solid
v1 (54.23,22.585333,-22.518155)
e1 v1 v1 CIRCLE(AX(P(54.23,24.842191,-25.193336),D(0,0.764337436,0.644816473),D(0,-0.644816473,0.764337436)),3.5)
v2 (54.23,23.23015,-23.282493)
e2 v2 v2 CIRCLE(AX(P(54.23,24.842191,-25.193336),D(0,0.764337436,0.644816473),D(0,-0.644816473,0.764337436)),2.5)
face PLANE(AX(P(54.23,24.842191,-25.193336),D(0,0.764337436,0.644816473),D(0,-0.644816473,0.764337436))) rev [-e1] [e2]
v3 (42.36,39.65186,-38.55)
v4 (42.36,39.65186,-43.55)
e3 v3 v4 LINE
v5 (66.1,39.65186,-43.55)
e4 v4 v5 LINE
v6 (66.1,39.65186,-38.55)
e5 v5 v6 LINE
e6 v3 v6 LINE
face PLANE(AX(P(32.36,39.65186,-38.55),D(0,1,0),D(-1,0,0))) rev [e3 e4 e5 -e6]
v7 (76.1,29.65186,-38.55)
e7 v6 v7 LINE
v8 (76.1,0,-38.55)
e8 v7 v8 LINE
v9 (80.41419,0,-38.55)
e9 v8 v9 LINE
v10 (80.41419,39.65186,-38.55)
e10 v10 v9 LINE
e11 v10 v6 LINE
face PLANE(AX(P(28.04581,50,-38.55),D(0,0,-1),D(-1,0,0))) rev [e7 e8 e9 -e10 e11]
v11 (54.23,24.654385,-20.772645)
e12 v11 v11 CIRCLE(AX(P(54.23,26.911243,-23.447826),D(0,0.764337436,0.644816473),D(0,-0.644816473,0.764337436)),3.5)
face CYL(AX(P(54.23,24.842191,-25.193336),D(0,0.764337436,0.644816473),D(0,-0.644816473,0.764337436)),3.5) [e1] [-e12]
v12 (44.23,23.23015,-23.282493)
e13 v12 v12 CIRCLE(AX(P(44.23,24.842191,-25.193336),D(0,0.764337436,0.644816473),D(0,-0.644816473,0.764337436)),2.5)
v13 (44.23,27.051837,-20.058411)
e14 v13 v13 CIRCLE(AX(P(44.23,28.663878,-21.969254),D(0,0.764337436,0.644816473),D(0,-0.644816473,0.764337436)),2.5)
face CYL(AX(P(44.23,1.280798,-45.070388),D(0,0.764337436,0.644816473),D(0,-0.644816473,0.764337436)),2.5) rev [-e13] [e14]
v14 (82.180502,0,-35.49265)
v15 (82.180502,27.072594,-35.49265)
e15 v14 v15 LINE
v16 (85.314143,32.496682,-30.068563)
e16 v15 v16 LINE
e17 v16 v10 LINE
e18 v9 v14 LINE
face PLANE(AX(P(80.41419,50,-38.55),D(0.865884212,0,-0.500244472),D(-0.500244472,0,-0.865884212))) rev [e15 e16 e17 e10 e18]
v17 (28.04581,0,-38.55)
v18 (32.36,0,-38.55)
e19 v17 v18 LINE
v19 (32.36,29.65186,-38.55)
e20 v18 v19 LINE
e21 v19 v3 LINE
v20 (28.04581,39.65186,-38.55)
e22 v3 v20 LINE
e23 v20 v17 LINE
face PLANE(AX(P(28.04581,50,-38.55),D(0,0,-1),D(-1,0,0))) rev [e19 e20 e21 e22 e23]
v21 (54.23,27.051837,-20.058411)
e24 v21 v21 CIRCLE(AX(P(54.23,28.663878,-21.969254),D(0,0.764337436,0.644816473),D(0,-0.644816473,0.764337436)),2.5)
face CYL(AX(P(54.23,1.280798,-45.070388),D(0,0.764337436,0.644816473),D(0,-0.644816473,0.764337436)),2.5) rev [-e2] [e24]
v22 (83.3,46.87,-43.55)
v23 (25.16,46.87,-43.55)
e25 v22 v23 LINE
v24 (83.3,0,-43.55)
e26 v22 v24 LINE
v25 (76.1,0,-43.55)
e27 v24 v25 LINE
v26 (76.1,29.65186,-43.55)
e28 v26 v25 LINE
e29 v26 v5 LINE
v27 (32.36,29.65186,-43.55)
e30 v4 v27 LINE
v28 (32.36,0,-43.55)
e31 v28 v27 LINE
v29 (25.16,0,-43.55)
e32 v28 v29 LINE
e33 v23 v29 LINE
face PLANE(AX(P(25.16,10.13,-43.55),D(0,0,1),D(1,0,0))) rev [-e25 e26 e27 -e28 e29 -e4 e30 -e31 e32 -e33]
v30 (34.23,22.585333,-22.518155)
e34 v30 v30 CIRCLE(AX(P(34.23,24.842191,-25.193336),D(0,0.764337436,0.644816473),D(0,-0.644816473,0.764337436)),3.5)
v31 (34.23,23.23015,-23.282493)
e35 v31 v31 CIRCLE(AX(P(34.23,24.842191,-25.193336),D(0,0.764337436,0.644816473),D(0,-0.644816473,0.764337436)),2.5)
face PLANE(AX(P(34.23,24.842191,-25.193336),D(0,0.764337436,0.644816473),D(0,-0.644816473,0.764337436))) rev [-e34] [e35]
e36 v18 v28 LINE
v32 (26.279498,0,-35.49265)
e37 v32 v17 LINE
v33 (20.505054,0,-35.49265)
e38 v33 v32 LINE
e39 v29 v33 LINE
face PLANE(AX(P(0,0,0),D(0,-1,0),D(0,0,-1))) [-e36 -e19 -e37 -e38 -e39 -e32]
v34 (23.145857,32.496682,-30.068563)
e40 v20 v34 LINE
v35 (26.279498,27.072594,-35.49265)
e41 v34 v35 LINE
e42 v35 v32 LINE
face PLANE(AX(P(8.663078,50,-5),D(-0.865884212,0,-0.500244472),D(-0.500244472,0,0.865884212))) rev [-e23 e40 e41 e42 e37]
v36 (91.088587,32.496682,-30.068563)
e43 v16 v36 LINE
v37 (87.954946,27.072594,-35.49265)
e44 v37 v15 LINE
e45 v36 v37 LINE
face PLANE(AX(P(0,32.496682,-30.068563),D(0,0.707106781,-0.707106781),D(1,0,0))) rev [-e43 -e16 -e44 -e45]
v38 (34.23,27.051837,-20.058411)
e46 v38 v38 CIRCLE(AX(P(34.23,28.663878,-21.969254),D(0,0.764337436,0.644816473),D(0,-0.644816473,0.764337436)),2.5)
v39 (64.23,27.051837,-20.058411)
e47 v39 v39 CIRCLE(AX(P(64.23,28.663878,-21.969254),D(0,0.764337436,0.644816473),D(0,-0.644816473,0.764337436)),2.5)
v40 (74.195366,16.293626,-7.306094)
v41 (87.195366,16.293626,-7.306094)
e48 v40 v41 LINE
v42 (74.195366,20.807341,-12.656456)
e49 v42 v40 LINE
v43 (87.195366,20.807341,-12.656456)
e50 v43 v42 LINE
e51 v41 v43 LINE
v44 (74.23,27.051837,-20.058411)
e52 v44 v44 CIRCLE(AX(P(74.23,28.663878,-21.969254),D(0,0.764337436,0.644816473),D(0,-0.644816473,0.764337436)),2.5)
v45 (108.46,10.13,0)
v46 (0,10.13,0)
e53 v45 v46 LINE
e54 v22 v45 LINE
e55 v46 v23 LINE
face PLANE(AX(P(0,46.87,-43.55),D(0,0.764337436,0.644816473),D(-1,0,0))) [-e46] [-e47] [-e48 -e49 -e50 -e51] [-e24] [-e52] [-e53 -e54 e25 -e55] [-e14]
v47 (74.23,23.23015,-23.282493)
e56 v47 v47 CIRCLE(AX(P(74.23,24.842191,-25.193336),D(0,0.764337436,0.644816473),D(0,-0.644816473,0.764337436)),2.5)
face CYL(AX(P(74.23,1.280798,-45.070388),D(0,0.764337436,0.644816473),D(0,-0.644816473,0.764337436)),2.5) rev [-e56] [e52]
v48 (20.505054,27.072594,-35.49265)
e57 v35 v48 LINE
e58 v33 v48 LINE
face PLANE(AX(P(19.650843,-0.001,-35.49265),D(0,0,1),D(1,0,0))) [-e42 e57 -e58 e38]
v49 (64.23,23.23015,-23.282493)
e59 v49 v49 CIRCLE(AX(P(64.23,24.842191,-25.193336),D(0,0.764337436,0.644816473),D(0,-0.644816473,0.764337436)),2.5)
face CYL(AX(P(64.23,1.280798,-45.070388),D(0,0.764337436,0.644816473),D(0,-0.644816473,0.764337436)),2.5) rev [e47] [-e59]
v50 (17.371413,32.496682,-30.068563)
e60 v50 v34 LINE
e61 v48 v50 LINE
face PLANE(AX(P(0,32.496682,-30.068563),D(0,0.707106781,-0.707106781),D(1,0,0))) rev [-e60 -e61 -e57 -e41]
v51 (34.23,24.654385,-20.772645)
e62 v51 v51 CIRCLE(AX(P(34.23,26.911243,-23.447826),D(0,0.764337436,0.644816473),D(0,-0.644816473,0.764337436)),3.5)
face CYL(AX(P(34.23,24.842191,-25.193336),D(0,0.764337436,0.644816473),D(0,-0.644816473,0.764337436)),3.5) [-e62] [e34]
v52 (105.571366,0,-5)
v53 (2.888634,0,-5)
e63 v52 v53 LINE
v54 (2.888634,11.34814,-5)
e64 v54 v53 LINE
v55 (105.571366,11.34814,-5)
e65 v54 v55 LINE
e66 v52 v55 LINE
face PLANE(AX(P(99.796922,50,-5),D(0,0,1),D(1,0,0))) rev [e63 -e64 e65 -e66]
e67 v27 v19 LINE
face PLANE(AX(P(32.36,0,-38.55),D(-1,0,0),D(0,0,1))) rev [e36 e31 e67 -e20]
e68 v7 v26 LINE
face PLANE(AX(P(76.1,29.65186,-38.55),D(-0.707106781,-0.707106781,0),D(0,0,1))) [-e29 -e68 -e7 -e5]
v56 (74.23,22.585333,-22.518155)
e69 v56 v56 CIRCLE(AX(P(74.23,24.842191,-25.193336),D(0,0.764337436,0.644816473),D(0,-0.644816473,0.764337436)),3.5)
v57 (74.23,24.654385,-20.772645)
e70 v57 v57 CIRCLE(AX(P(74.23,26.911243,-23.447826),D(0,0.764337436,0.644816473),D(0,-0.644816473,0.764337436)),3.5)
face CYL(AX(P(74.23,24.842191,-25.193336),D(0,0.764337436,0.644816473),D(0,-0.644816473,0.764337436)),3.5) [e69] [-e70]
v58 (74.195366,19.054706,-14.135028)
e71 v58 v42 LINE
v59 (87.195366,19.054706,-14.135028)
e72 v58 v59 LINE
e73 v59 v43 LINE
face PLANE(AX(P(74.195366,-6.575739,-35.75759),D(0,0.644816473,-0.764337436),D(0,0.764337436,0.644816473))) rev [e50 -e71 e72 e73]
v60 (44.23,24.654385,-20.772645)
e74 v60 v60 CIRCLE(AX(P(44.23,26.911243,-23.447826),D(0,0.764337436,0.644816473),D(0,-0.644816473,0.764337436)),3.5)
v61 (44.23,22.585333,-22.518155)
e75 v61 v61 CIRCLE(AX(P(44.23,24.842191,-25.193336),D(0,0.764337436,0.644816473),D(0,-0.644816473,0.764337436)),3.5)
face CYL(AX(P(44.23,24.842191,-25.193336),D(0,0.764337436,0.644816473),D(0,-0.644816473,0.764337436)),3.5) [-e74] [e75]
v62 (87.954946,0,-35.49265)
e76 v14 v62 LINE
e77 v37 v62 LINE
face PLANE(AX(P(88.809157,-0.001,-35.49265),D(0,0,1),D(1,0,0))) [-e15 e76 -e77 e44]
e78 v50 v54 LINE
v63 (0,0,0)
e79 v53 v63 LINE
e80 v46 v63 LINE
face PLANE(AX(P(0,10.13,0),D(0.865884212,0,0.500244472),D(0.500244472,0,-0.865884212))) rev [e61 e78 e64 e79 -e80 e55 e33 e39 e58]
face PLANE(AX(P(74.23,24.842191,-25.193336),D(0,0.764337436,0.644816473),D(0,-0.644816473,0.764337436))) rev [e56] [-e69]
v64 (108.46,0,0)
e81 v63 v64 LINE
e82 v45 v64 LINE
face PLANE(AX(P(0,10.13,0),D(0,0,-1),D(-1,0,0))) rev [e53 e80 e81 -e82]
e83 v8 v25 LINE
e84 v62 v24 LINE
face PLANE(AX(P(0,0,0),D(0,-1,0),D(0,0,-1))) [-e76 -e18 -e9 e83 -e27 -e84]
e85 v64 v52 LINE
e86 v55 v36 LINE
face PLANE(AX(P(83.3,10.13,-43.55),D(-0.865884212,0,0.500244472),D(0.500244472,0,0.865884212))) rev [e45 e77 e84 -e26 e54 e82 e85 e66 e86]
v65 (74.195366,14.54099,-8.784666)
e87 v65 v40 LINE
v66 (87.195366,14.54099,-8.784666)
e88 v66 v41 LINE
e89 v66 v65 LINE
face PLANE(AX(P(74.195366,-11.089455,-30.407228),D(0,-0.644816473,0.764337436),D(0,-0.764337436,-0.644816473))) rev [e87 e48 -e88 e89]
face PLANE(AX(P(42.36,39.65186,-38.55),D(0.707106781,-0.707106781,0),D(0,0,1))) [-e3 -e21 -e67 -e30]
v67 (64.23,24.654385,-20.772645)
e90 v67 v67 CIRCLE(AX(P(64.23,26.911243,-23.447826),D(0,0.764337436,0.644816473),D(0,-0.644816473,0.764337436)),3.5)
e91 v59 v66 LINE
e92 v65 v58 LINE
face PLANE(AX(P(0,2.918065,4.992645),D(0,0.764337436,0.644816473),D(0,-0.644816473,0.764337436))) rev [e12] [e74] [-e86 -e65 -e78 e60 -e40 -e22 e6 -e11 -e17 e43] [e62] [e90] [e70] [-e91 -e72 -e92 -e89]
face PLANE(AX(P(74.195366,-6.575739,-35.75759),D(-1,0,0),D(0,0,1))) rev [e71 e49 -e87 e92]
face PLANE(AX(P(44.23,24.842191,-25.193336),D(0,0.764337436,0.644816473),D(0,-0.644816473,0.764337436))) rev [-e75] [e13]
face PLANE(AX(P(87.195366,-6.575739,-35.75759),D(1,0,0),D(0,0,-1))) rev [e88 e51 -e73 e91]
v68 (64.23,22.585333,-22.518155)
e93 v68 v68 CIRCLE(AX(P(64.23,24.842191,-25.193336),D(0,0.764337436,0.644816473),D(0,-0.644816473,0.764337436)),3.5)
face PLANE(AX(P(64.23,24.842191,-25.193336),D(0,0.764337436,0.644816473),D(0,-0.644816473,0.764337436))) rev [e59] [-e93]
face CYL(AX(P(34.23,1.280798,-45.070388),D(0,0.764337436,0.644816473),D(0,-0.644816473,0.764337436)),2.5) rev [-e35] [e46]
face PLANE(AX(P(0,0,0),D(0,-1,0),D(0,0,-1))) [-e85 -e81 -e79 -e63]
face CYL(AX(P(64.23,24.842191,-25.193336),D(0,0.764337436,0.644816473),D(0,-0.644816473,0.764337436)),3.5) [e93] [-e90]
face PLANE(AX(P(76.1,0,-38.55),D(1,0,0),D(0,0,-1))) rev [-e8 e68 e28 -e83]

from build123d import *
from OCP.BRepFilletAPI import BRepFilletAPI_MakeChamfer

# Parameters (mm, degrees)
BOSS_EXTRUDE1_DEPTH = 10.13
BOSS_EXTRUDE2_DEPTH = 36.74
CHAMFER1_SIZE2      = 43.55
CHAMFER1_SIZE       = 36.74
CUT_EXTRUDE1_DEPTH  = 50
BOSS_EXTRUDE3_DEPTH = 3
SKETCH12_W          = 43.74
SKETCH12_H          = 39.651859931
CUT_EXTRUDE2_DEPTH  = 5
CUT_EXTRUDE3_REACH  = 127.686
SKETCH13_R          = 2.5
SKETCH15_R          = 3.5
SKETCH15_R_2        = 2.5
BOSS_EXTRUDE4_DEPTH = 5
CUT_EXTRUDE4_REACH  = 127.686
SKETCH16_W          = 13
SKETCH16_H          = 7
LPATTERN1_COUNT     = 5
LPATTERN1_PITCH     = 10
LPATTERN2_COUNT     = 5
LPATTERN2_PITCH     = 10
CUT_EXTRUDE5_REACH  = 167.082
CHAMFER2_SIZE       = 10
CHAMFER2_SIZE2      = 7.096456913
CHAMFER3_SIZE       = 10


with BuildPart() as part:
    # Sketch1 → Boss-Extrude1 (new body)
    with BuildSketch(Plane(origin=(0, 0, 0), x_dir=(1, 0, 0), z_dir=(0, 1, 0))):
        Polygon((0, 0), (108.46, 0), (83.3, 43.55), (25.16, 43.55), align=None)
    extrude(amount=BOSS_EXTRUDE1_DEPTH)

    # Sketch4 → Boss-Extrude2 (add)
    with BuildSketch(Plane(origin=(0, 10.13, 0), x_dir=(1, 0, 0), z_dir=(0, 1, 0))):
        Polygon((25.16, 43.55), (0, 0), (108.46, 0), (83.3, 43.55), align=None)
    extrude(amount=BOSS_EXTRUDE2_DEPTH)

    # Chamfer1
    chamfer1_edges = [part.edges().sort_by_distance(p)[0] for p in [
        (54.23, 46.87, 0),
    ]]
    chamfer1_side = [part.faces().sort_by_distance(p)[0] for p in [
        (54.23, 46.1352, 0),
    ]]
    chamfer(chamfer1_edges, length=CHAMFER1_SIZE - 0.0001, length2=CHAMFER1_SIZE2 - 0.0001, reference=chamfer1_side[0])  # a hair under: the kernel refuses the full size

    # Sketch10 → Cut-Extrude1 (cut)
    with BuildSketch(Plane.XZ):
        Polygon((8.66307788, -5), (28.045810372, -38.55), (80.414189628, -38.55), (99.79692212, -5), align=None)
    extrude(amount=-CUT_EXTRUDE1_DEPTH, mode=Mode.SUBTRACT)

    # Sketch11 → Boss-Extrude3 (add, along a direction that is not the sketch's normal)
    with BuildSketch(Plane(origin=(0, 5.918064684, 4.992645155), x_dir=(1, 0, 0), z_dir=(0, 0.7643374360351171, 0.6448164730179148))):
        Polygon((8.66307788, 13.073604254), (99.79692212, 13.073604254), (80.414189628, 56.967830048), (28.045810372, 56.967830048), align=None)
    extrude(amount=-BOSS_EXTRUDE3_DEPTH, dir=(0, 1, 0))

    # Sketch12 → Cut-Extrude2 (cut)
    with BuildSketch(Plane(origin=(0, 0, -43.55), x_dir=(-1, 0, 0), z_dir=(0, 0, -1))):
        with Locations((-54.23, 19.825929966)):
            Rectangle(SKETCH12_W, SKETCH12_H)
    extrude(amount=-CUT_EXTRUDE2_DEPTH, mode=Mode.SUBTRACT)

    # Sketch13 → Cut-Extrude3 (cut, up to next)
    with BuildSketch(Plane(origin=(0, 5.918064684, 4.992645155), x_dir=(1, 0, 0), z_dir=(0, 0.7643374360351171, 0.6448164730179148)), mode=Mode.PRIVATE) as cut_extrude3_sk1:
        with Locations(Location((74.23, 35.27486423, 0), (0, 0, 270))):
            Circle(SKETCH13_R)
    cut_extrude3_tool1 = extrude(cut_extrude3_sk1.sketch, amount=-CUT_EXTRUDE3_REACH, mode=Mode.PRIVATE) & part.part
    cut_extrude3 = cut_extrude3_tool1.solids().sort_by_distance((74.23, 28.663878, -21.969254))[0]
    add(cut_extrude3, mode=Mode.SUBTRACT)

    # Sketch15 → Boss-Extrude4 (add)
    with BuildSketch(Plane(origin=(0, 5.918064684, 4.992645155), x_dir=(1, 0, 0), z_dir=(0, 0.7643374360351171, 0.6448164730179148))):
        with Locations(Location((74.23, 35.27486423, 0), (0, 0, 270))):
            Circle(SKETCH15_R)
        with Locations(Location((74.23, 35.27486423, 0), (0, 0, 270))):
            Circle(SKETCH15_R_2, mode=Mode.SUBTRACT)
    boss_extrude4 = extrude(amount=-BOSS_EXTRUDE4_DEPTH)

    # Sketch16 → Cut-Extrude4 (cut, up to next)
    with BuildSketch(Plane(origin=(0, 5.918064684, 4.992645155), x_dir=(1, 0, 0), z_dir=(0, 0.7643374360351172, 0.6448164730179149)), mode=Mode.PRIVATE) as cut_extrude4_sk1:
        with Locations((80.69536615, 19.590719272)):
            Rectangle(SKETCH16_W, SKETCH16_H)
    cut_extrude4_tool1 = extrude(cut_extrude4_sk1.sketch, amount=-CUT_EXTRUDE4_REACH, mode=Mode.PRIVATE) & part.part
    add(cut_extrude4_tool1.solids().sort_by_distance((80.695366, 18.550483, -9.981275))[0], mode=Mode.SUBTRACT)

    # LPattern1: Cut-Extrude3 ×5
    with Locations(*[(-i * LPATTERN1_PITCH, 0, 0) for i in range(1, LPATTERN1_COUNT)]):
        add(cut_extrude3, mode=Mode.SUBTRACT)

    # LPattern2: Boss-Extrude4 ×5
    with Locations(*[(-i * LPATTERN2_PITCH, 0, 0) for i in range(1, LPATTERN2_COUNT)]):
        add(boss_extrude4)

    # Cut-Extrude5: up to this plane
    cut_extrude5_end = Plane(origin=(0, 0, 0), z_dir=(0, -1, 0))
    # Sketch20 → Cut-Extrude5 (cut, up to the surface)
    with BuildSketch(Plane(origin=(0, 4.165429536, 3.514073046), x_dir=(1, 0, 0), z_dir=(0, -0.7643374360351171, -0.644816473017915)), mode=Mode.PRIVATE) as cut_extrude5_sk1:
        Polygon((10.517235303, -11.139154835), (2.034423094, -11.139154835), (19.650842851, -51.033380629), (29.759813719, -51.033380629), align=None)
    cut_extrude5_tool1 = split(extrude(cut_extrude5_sk1.sketch, amount=CUT_EXTRUDE5_REACH, dir=(0, -1, 0), mode=Mode.PRIVATE), bisect_by=cut_extrude5_end, keep=Keep.BOTH, mode=Mode.PRIVATE)
    add(cut_extrude5_tool1.solids().sort_by_distance((15.759239, 24.585372, -20.690839))[0], mode=Mode.SUBTRACT)
    # Sketch20 → Cut-Extrude5 (cut, up to the surface)
    with BuildSketch(Plane(origin=(0, 4.165429536, 3.514073046), x_dir=(1, 0, 0), z_dir=(0, -0.7643374360351171, -0.644816473017915)), mode=Mode.PRIVATE) as cut_extrude5_sk2:
        Polygon((78.700186281, -51.033380629), (97.942764697, -11.139154835), (106.425576906, -11.139154835), (88.809157149, -51.033380629), align=None)
    cut_extrude5_tool2 = split(extrude(cut_extrude5_sk2.sketch, amount=CUT_EXTRUDE5_REACH, dir=(0, -1, 0), mode=Mode.PRIVATE), bisect_by=cut_extrude5_end, keep=Keep.BOTH, mode=Mode.PRIVATE)
    add(cut_extrude5_tool2.solids().sort_by_distance((92.700761, 24.585372, -20.690839))[0], mode=Mode.SUBTRACT)

    # Chamfer2: one chamfer whose edges measure the first distance from different faces: ONE call of the kernel's chamfer builder (chamfer() names one face for all edges)
    chamfer2_edges_1 = [part.edges().sort_by_distance(p)[0] for p in [
        (23.392275575, 37.072594039, -35.492650256),
    ]]
    chamfer2_side_1 = [part.faces().sort_by_distance(p)[0] for p in [
        (23.392275575, 18.53629702, -35.492650256),
    ]]
    chamfer2_edges_2 = [part.edges().sort_by_distance(p)[0] for p in [
        (85.067724425, 37.072594039, -35.492650256),
    ]]
    chamfer2_side_2 = [part.faces().sort_by_distance(p)[0] for p in [
        (85.067724425, 18.53629702, -35.492650256),
    ]]
    chamfer2 = BRepFilletAPI_MakeChamfer(part.part.solid().wrapped)
    for e in chamfer2_edges_1:
        chamfer2.Add(CHAMFER2_SIZE, CHAMFER2_SIZE2, e.wrapped, chamfer2_side_1[0].wrapped)  # the first distance lies on this face
    for e in chamfer2_edges_2:
        chamfer2.Add(CHAMFER2_SIZE, CHAMFER2_SIZE2, e.wrapped, chamfer2_side_2[0].wrapped)  # the first distance lies on this face
    add(Compound.cast(chamfer2.Shape()), mode=Mode.REPLACE)

    # Chamfer3
    chamfer3_edges = [part.edges().sort_by_distance(p)[0] for p in [
        (32.36, 39.651859931, -41.05),
        (76.1, 39.651859931, -41.05),
    ]]
    chamfer(chamfer3_edges, length=CHAMFER3_SIZE)


solid = part.part
